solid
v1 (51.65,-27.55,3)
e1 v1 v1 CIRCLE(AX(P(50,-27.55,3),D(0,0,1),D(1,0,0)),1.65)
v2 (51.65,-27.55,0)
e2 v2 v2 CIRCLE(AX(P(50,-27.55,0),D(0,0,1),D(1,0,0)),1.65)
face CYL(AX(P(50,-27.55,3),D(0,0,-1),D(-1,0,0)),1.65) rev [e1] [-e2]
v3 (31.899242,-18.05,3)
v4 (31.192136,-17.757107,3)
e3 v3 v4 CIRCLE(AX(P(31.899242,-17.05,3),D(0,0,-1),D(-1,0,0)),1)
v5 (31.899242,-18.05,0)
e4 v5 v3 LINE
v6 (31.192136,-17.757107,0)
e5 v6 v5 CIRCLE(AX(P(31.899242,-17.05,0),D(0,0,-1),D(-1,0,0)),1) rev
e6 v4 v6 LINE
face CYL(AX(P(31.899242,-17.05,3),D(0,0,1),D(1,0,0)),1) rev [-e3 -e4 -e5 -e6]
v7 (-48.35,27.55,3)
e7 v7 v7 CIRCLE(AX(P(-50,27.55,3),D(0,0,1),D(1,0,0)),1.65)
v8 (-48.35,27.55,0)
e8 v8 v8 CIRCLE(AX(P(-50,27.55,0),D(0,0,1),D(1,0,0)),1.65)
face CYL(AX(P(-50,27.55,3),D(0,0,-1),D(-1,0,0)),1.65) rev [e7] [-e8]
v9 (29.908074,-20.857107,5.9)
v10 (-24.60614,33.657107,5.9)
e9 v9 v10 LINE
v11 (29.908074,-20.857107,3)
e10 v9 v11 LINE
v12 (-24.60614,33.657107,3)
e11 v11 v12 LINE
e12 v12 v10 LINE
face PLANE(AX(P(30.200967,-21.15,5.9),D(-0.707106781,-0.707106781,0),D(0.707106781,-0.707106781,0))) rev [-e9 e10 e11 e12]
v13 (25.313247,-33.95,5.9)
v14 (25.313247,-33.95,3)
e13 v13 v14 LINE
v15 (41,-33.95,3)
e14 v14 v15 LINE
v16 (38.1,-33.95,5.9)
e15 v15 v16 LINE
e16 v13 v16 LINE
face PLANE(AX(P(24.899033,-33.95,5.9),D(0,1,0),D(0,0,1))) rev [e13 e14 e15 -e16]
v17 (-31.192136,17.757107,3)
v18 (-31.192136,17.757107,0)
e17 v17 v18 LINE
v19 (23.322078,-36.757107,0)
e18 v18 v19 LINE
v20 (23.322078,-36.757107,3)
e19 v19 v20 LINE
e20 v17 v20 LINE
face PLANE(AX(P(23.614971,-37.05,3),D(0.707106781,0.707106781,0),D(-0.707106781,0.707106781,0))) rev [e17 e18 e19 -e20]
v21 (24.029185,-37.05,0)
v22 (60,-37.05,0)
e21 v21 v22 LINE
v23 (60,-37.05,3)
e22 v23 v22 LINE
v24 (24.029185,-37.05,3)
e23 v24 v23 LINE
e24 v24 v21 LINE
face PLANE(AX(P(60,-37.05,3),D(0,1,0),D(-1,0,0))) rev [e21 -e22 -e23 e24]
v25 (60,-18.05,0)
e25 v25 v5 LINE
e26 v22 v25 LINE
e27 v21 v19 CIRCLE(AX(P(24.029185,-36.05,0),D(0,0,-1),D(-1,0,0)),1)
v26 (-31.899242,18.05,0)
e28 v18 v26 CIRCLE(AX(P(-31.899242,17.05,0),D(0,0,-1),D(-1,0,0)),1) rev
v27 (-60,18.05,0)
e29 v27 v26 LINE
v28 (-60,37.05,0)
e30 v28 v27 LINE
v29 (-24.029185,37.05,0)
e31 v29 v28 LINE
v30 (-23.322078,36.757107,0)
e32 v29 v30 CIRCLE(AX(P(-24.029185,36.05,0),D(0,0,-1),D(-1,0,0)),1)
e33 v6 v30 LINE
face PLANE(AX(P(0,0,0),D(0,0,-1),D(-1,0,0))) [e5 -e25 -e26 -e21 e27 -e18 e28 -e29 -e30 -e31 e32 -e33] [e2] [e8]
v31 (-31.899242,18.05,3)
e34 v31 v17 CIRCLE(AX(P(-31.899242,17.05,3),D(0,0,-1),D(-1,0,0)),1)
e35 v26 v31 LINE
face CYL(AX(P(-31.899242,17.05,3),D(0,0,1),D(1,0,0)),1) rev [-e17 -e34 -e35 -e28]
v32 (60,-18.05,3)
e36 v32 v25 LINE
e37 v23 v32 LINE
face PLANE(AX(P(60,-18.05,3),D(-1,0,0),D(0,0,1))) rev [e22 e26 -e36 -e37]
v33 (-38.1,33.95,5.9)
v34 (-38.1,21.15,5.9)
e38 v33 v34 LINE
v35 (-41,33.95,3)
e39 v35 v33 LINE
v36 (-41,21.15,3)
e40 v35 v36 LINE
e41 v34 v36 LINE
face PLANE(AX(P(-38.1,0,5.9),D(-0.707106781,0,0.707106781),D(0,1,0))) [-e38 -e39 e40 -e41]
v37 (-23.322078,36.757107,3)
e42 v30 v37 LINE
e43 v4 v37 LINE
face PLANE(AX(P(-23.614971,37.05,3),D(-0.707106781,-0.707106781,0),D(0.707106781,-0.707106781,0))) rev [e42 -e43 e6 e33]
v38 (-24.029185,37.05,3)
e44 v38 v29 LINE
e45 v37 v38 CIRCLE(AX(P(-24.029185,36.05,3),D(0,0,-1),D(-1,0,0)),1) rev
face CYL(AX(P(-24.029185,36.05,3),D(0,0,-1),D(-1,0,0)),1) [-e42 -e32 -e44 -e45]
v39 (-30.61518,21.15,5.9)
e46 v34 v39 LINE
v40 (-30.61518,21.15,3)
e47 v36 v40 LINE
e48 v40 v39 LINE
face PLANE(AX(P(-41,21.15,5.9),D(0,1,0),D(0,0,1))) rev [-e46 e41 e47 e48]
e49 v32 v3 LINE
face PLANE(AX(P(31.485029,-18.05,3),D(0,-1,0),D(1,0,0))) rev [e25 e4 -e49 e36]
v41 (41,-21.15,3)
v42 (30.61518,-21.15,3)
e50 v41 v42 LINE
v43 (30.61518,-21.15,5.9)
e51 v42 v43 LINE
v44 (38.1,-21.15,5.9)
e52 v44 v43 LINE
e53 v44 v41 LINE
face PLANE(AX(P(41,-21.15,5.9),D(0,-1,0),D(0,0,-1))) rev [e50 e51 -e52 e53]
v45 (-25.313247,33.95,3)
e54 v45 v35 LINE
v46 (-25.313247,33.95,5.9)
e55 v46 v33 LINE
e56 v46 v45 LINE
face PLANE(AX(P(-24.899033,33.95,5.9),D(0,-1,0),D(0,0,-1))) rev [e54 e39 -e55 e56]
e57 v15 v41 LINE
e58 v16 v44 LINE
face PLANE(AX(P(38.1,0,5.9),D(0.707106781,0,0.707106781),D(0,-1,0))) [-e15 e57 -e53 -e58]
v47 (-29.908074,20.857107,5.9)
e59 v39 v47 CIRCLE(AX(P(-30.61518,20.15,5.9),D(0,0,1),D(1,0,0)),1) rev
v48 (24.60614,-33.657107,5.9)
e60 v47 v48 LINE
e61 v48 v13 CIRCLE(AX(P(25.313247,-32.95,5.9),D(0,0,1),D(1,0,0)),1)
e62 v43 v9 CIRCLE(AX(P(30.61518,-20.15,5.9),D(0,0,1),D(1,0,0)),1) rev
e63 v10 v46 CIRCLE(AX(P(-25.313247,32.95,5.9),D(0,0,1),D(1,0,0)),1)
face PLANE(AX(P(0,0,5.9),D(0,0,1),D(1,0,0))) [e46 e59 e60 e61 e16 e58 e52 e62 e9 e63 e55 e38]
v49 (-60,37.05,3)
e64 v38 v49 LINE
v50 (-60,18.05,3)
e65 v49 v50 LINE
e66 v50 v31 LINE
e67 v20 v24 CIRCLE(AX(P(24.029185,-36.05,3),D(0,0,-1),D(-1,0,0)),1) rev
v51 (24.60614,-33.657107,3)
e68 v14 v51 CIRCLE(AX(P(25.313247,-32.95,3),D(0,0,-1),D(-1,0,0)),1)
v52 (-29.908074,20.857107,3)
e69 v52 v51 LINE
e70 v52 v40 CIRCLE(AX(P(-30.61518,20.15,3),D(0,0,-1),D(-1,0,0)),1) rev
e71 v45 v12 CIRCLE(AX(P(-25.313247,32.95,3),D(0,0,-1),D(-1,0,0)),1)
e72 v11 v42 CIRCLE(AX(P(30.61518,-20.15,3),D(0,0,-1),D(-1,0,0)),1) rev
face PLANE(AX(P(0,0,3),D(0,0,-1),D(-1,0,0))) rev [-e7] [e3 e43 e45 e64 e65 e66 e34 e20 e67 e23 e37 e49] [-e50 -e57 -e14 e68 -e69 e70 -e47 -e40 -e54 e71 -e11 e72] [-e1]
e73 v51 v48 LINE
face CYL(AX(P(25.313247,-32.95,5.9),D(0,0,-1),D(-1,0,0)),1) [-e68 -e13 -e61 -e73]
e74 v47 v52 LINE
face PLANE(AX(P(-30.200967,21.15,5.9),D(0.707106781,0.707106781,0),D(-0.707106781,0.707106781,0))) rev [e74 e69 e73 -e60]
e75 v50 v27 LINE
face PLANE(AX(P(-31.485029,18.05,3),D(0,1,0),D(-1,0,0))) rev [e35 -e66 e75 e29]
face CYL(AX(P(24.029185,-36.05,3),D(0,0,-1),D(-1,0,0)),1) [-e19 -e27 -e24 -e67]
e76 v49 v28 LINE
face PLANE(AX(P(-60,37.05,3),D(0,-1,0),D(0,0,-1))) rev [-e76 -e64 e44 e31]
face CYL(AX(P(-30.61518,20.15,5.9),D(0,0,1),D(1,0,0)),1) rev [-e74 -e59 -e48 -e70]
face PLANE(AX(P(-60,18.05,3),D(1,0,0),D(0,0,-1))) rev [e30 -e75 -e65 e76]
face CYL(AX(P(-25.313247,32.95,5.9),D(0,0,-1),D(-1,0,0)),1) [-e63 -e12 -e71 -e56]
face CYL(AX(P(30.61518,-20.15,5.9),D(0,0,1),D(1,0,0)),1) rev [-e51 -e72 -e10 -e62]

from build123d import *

# Parameters (mm, degrees)
SKETCH_1_R      = 1.65
EXTRUDE_1_DEPTH = 3
EXTRUDE_2_DEPTH = 2.9
CHAMFER_1_SIZE  = 2.9
FILLET_1_R      = 1


with BuildPart() as part:
    # 草图1 → 凸台-拉伸1 (new body)
    with BuildSketch(Plane.XY):
        Polygon((-60, 37.05), (-23.614971157, 37.05), (31.485028843, -18.05), (60, -18.05), (60, -37.05), (23.614971157, -37.05), (-31.485028843, 18.05), (-60, 18.05), align=None)
        with Locations((-50, 27.55)):
            Circle(SKETCH_1_R, mode=Mode.SUBTRACT)
        with Locations((50, -27.55)):
            Circle(SKETCH_1_R, mode=Mode.SUBTRACT)
    extrude(amount=EXTRUDE_1_DEPTH)

    # 草图2 → 凸台-拉伸2 (add)
    with BuildSketch(Plane.XY.offset(3)):
        Polygon((-41, 33.95), (-41, 21.15), (-30.200966799, 21.15), (24.899033201, -33.95), (41, -33.95), (41, -21.15), (30.200966799, -21.15), (-24.899033201, 33.95), align=None)
    extrude(amount=EXTRUDE_2_DEPTH)

    # 倒角1
    chamfer_1_edges = [part.edges().sort_by_distance(p)[0] for p in [
        (41, -27.55, 5.9),
        (-41, 27.55, 5.9),
    ]]
    chamfer(chamfer_1_edges, length=CHAMFER_1_SIZE - 0.0001)  # a hair under: the kernel refuses the full size

    # 圆角1
    fillet_1_edges = [part.edges().sort_by_distance(p)[0] for p in [
        (-23.614971157, 37.05, 1.5),
        (31.485028843, -18.05, 1.5),
        (23.614971157, -37.05, 1.5),
        (-31.485028843, 18.05, 1.5),
        (-24.899033201, 33.95, 4.45),
        (-30.200966799, 21.15, 4.45),
        (24.899033201, -33.95, 4.45),
        (30.200966799, -21.15, 4.45),
    ]]
    fillet(fillet_1_edges, radius=FILLET_1_R)


solid = part.part
